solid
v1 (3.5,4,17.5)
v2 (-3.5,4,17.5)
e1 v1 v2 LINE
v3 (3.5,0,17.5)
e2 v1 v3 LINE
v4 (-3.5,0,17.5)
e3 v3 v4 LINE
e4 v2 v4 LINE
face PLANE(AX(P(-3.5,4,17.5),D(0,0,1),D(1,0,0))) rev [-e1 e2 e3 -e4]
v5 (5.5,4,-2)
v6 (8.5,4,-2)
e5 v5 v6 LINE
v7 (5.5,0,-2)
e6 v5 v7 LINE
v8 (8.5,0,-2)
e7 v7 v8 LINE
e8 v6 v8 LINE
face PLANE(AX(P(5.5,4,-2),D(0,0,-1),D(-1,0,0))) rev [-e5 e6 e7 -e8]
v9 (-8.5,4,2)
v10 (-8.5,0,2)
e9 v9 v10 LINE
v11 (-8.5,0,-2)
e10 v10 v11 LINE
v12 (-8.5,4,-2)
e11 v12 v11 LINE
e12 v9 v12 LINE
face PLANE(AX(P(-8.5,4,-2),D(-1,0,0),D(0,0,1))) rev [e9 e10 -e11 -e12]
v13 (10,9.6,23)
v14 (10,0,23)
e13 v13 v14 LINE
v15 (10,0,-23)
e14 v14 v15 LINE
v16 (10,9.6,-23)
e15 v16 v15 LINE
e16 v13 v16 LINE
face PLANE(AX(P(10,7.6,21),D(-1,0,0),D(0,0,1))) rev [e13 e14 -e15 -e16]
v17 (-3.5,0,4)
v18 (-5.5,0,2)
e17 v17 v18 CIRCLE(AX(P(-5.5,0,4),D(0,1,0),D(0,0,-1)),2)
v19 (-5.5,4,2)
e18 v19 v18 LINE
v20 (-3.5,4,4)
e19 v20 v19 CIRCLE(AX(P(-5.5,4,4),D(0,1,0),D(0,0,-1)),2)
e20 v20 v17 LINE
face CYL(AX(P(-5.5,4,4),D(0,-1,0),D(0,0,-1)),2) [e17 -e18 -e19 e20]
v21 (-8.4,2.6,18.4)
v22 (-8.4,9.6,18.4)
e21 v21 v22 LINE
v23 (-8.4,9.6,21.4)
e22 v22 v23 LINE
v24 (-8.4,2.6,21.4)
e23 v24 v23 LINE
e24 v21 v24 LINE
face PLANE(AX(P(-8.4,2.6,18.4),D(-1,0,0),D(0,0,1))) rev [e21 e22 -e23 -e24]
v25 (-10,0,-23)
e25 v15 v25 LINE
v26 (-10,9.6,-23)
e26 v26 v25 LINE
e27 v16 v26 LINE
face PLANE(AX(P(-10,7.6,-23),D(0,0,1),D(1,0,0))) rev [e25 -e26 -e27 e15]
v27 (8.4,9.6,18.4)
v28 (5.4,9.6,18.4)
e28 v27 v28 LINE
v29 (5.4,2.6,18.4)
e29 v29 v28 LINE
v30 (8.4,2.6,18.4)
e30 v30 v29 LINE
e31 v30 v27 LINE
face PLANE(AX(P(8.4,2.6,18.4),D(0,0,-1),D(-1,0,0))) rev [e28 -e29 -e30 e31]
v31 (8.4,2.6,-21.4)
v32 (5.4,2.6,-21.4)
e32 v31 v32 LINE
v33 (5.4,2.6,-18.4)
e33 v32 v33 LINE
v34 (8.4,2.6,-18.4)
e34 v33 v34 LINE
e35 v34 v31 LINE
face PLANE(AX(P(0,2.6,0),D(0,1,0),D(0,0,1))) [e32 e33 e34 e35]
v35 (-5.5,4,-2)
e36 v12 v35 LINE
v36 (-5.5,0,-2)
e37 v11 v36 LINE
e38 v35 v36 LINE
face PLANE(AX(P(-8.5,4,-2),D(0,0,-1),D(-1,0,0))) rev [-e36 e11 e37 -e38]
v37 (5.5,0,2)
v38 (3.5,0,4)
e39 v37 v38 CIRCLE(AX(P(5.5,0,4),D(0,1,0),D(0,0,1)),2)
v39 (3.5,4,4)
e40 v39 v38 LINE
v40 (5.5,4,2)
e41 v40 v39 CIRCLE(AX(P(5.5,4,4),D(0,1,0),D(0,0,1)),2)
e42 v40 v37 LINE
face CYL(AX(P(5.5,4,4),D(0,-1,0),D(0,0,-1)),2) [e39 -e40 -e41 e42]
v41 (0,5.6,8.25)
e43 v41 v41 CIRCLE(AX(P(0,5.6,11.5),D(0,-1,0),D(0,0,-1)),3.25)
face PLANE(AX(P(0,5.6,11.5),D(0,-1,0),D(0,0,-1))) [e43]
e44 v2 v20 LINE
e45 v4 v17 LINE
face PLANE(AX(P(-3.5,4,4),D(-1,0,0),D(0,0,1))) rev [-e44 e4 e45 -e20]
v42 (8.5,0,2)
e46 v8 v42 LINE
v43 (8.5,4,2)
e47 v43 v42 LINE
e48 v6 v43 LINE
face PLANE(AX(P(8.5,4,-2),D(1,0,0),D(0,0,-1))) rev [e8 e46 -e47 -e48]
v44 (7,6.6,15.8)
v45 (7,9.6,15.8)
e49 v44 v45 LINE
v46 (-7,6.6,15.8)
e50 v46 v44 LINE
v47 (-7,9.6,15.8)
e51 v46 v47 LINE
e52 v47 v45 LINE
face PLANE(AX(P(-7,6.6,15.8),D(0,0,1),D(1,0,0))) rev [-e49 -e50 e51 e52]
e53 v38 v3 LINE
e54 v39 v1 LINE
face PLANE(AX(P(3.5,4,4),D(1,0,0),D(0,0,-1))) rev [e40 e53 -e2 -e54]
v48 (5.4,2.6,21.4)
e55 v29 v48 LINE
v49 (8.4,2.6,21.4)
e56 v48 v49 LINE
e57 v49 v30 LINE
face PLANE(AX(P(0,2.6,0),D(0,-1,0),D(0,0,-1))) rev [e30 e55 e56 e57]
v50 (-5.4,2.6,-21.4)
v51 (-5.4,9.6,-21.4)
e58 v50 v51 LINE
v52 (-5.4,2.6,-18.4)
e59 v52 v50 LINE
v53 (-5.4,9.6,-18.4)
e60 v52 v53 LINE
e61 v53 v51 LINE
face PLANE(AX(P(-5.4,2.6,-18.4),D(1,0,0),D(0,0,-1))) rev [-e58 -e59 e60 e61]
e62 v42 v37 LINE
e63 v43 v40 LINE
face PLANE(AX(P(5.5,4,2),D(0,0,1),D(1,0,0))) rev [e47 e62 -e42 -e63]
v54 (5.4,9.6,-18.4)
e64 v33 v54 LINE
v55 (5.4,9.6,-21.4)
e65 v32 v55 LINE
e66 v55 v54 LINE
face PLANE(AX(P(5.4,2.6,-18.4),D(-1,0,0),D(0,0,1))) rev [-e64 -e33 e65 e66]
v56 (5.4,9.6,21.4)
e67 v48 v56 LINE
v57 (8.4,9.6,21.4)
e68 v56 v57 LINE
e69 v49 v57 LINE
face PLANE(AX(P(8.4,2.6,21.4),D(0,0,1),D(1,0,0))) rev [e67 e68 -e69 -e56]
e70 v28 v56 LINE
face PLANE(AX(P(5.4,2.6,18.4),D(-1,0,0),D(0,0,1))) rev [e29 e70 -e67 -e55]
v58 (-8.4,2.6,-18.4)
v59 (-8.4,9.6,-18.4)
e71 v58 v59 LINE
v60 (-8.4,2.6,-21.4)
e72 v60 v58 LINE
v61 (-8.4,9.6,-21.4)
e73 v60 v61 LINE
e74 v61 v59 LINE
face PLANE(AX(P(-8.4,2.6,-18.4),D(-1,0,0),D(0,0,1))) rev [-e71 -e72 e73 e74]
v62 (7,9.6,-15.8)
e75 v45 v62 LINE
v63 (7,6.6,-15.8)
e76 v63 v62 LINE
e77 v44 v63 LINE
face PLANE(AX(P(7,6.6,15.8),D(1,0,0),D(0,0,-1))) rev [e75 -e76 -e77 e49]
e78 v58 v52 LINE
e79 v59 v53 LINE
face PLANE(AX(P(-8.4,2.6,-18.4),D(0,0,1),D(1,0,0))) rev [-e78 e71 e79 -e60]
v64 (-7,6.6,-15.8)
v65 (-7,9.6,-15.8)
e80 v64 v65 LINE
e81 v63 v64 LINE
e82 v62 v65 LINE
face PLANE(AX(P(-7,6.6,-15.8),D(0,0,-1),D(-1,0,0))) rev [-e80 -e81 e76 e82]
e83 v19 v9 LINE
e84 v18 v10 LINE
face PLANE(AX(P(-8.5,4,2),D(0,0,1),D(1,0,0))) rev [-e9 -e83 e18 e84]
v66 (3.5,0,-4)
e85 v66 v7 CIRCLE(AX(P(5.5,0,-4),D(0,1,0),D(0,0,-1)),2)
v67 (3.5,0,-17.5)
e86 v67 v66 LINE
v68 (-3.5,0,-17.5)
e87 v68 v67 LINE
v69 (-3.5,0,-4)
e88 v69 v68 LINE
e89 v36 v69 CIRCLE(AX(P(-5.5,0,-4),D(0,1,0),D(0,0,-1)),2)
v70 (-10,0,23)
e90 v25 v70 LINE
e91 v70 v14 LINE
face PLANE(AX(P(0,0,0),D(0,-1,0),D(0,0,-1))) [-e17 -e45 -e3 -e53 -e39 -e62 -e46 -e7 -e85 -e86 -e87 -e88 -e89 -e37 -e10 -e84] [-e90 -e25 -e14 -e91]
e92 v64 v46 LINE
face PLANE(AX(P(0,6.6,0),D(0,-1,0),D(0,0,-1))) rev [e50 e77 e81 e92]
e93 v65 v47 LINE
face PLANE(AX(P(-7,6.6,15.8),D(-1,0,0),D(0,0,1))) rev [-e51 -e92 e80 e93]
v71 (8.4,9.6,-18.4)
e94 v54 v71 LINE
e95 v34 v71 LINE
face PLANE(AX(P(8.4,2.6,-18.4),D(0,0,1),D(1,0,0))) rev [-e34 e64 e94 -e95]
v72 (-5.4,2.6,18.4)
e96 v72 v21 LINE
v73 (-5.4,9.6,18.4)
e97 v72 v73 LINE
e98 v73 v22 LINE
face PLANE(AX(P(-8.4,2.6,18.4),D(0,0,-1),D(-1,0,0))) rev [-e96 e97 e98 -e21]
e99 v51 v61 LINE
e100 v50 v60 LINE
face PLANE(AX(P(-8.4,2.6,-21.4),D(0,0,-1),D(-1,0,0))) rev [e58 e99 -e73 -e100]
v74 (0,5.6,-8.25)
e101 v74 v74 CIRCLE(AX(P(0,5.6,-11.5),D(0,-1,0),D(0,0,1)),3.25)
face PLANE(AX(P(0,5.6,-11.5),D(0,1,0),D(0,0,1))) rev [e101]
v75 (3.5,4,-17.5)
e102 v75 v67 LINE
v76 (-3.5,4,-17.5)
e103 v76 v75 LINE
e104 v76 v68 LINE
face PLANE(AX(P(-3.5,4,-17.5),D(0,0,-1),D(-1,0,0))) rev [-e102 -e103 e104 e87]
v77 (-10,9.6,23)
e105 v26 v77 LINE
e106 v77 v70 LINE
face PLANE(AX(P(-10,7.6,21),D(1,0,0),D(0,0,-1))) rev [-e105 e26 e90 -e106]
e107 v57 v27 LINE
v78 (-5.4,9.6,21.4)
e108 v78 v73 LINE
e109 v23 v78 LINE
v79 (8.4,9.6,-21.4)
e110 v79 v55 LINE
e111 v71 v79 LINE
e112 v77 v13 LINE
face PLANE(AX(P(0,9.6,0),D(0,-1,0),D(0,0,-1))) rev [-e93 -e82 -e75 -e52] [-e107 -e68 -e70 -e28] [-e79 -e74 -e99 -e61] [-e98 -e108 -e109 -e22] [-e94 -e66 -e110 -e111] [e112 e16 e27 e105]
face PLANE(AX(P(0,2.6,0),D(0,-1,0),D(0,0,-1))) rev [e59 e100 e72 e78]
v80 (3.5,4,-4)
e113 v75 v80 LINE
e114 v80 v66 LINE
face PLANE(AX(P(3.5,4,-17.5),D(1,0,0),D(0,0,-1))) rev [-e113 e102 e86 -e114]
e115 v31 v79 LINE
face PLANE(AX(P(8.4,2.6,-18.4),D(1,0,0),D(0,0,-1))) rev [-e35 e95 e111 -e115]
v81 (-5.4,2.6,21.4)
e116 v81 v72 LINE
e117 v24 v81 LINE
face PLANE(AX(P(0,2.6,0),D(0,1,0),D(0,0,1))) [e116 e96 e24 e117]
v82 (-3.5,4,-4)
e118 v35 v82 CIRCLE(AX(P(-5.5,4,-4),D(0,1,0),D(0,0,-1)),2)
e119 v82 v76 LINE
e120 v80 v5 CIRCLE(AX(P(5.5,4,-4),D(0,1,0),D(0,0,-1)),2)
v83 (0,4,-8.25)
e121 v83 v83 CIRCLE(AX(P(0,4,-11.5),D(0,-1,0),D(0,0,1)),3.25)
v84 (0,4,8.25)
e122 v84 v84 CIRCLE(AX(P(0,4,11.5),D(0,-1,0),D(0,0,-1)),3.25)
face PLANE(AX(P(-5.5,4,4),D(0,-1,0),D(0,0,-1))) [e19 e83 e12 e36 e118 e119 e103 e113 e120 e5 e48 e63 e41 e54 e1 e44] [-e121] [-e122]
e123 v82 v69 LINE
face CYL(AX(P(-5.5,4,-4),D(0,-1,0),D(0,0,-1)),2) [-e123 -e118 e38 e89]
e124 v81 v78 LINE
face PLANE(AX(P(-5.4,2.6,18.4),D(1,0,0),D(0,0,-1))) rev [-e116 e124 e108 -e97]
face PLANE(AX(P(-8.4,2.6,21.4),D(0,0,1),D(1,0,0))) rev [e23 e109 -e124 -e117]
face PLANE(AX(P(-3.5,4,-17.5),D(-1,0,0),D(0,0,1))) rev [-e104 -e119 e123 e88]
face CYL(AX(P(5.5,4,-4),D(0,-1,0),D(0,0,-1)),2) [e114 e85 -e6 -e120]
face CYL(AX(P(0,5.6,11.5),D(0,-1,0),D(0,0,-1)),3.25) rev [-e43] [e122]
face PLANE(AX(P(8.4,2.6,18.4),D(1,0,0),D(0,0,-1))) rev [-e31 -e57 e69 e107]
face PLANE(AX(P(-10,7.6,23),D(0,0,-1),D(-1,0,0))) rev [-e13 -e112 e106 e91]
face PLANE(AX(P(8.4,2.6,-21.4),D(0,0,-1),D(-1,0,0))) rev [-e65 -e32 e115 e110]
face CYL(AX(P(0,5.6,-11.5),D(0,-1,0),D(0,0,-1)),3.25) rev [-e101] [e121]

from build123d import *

# Parameters (mm, degrees)
SKETCH1_W           = 20
SKETCH1_H           = 42
BOSS_EXTRUDE1_DEPTH = 7.6
CUT_EXTRUDE1_DEPTH  = 4
THICKEN1_START      = -10
THICKEN1_DEPTH      = 20
SKETCH3_R           = 3.25
CUT_EXTRUDE2_DEPTH  = 1.6
SKETCH5_W           = 3
SKETCH5_H           = 3
CUT_EXTRUDE4_DEPTH  = 7
SKETCH6_W           = 14
SKETCH6_H           = 31.6
CUT_EXTRUDE5_DEPTH  = 3


# Read off the part's stored shape, not the designer's step: Thicken1
with BuildPart() as part:
    # Sketch1 → Boss-Extrude1 (new body)
    with BuildSketch(Plane(origin=(0, 0, 0), x_dir=(1, 0, 0), z_dir=(0, 1, 0))):
        Rectangle(SKETCH1_W, SKETCH1_H)
    extrude(amount=BOSS_EXTRUDE1_DEPTH)

    # Sketch2 → Cut-Extrude1 (cut)
    with BuildSketch(Plane.XZ):
        with BuildLine():
            Line((5.5, 2), (8.5, 2))
            Line((8.5, 2), (8.5, -2))
            Line((8.5, -2), (5.5, -2))
            ThreePointArc((5.5, -2), (4.085786438, -2.585786438), (3.5, -4))
            Line((3.5, -4), (3.5, -17.5))
            Line((3.5, -17.5), (-3.5, -17.5))
            Line((-3.5, -17.5), (-3.5, -4))
            ThreePointArc((-3.5, -4), (-4.085786438, -2.585786438), (-5.5, -2))
            Line((-5.5, -2), (-8.5, -2))
            Line((-8.5, -2), (-8.5, 2))
            Line((-8.5, 2), (-5.5, 2))
            ThreePointArc((-5.5, 2), (-4.085786438, 2.585786438), (-3.5, 4))
            Line((-3.5, 4), (-3.5, 17.5))
            Line((-3.5, 17.5), (3.5, 17.5))
            Line((3.5, 17.5), (3.5, 4))
            ThreePointArc((3.5, 4), (4.085786438, 2.585786438), (5.5, 2))
        make_face()
    extrude(amount=-CUT_EXTRUDE1_DEPTH, mode=Mode.SUBTRACT)

    # Thicken1 outline → Thicken1 (add)
    with BuildSketch(Plane.YZ.offset(THICKEN1_START)):
        Polygon((0, -23), (9.6, -23), (9.6, 23), (0, 23), (0, 21), (7.6, 21), (7.6, -21), (0, -21), align=None)
    extrude(amount=THICKEN1_DEPTH)

    # Sketch3 → Cut-Extrude2 (cut)
    with BuildSketch(Plane.XZ.offset(-4)):
        with Locations(Location((0, 11.5, 0), (0, 0, 270))):
            Circle(SKETCH3_R)
        with Locations(Location((0, -11.5, 0), (0, 0, 90))):
            Circle(SKETCH3_R)
    extrude(amount=-CUT_EXTRUDE2_DEPTH, mode=Mode.SUBTRACT)

    # Sketch5 → Cut-Extrude4 (cut)
    with BuildSketch(Plane(origin=(0, 9.6, 0), x_dir=(1, 0, 0), z_dir=(0, 1, 0))):
        with Locations((-6.9, 19.9)):
            Rectangle(SKETCH5_W, SKETCH5_H)
        with Locations((6.9, 19.9)):
            Rectangle(SKETCH5_W, SKETCH5_H)
        with Locations((6.9, -19.9)):
            Rectangle(SKETCH5_W, SKETCH5_H)
        with Locations((-6.9, -19.9)):
            Rectangle(SKETCH5_W, SKETCH5_H)
    extrude(amount=-CUT_EXTRUDE4_DEPTH, mode=Mode.SUBTRACT)

    # Sketch6 → Cut-Extrude5 (cut)
    with BuildSketch(Plane(origin=(0, 9.6, 0), x_dir=(1, 0, 0), z_dir=(0, 1, 0))):
        Rectangle(SKETCH6_W, SKETCH6_H)
    extrude(amount=-CUT_EXTRUDE5_DEPTH, mode=Mode.SUBTRACT)


solid = part.part
